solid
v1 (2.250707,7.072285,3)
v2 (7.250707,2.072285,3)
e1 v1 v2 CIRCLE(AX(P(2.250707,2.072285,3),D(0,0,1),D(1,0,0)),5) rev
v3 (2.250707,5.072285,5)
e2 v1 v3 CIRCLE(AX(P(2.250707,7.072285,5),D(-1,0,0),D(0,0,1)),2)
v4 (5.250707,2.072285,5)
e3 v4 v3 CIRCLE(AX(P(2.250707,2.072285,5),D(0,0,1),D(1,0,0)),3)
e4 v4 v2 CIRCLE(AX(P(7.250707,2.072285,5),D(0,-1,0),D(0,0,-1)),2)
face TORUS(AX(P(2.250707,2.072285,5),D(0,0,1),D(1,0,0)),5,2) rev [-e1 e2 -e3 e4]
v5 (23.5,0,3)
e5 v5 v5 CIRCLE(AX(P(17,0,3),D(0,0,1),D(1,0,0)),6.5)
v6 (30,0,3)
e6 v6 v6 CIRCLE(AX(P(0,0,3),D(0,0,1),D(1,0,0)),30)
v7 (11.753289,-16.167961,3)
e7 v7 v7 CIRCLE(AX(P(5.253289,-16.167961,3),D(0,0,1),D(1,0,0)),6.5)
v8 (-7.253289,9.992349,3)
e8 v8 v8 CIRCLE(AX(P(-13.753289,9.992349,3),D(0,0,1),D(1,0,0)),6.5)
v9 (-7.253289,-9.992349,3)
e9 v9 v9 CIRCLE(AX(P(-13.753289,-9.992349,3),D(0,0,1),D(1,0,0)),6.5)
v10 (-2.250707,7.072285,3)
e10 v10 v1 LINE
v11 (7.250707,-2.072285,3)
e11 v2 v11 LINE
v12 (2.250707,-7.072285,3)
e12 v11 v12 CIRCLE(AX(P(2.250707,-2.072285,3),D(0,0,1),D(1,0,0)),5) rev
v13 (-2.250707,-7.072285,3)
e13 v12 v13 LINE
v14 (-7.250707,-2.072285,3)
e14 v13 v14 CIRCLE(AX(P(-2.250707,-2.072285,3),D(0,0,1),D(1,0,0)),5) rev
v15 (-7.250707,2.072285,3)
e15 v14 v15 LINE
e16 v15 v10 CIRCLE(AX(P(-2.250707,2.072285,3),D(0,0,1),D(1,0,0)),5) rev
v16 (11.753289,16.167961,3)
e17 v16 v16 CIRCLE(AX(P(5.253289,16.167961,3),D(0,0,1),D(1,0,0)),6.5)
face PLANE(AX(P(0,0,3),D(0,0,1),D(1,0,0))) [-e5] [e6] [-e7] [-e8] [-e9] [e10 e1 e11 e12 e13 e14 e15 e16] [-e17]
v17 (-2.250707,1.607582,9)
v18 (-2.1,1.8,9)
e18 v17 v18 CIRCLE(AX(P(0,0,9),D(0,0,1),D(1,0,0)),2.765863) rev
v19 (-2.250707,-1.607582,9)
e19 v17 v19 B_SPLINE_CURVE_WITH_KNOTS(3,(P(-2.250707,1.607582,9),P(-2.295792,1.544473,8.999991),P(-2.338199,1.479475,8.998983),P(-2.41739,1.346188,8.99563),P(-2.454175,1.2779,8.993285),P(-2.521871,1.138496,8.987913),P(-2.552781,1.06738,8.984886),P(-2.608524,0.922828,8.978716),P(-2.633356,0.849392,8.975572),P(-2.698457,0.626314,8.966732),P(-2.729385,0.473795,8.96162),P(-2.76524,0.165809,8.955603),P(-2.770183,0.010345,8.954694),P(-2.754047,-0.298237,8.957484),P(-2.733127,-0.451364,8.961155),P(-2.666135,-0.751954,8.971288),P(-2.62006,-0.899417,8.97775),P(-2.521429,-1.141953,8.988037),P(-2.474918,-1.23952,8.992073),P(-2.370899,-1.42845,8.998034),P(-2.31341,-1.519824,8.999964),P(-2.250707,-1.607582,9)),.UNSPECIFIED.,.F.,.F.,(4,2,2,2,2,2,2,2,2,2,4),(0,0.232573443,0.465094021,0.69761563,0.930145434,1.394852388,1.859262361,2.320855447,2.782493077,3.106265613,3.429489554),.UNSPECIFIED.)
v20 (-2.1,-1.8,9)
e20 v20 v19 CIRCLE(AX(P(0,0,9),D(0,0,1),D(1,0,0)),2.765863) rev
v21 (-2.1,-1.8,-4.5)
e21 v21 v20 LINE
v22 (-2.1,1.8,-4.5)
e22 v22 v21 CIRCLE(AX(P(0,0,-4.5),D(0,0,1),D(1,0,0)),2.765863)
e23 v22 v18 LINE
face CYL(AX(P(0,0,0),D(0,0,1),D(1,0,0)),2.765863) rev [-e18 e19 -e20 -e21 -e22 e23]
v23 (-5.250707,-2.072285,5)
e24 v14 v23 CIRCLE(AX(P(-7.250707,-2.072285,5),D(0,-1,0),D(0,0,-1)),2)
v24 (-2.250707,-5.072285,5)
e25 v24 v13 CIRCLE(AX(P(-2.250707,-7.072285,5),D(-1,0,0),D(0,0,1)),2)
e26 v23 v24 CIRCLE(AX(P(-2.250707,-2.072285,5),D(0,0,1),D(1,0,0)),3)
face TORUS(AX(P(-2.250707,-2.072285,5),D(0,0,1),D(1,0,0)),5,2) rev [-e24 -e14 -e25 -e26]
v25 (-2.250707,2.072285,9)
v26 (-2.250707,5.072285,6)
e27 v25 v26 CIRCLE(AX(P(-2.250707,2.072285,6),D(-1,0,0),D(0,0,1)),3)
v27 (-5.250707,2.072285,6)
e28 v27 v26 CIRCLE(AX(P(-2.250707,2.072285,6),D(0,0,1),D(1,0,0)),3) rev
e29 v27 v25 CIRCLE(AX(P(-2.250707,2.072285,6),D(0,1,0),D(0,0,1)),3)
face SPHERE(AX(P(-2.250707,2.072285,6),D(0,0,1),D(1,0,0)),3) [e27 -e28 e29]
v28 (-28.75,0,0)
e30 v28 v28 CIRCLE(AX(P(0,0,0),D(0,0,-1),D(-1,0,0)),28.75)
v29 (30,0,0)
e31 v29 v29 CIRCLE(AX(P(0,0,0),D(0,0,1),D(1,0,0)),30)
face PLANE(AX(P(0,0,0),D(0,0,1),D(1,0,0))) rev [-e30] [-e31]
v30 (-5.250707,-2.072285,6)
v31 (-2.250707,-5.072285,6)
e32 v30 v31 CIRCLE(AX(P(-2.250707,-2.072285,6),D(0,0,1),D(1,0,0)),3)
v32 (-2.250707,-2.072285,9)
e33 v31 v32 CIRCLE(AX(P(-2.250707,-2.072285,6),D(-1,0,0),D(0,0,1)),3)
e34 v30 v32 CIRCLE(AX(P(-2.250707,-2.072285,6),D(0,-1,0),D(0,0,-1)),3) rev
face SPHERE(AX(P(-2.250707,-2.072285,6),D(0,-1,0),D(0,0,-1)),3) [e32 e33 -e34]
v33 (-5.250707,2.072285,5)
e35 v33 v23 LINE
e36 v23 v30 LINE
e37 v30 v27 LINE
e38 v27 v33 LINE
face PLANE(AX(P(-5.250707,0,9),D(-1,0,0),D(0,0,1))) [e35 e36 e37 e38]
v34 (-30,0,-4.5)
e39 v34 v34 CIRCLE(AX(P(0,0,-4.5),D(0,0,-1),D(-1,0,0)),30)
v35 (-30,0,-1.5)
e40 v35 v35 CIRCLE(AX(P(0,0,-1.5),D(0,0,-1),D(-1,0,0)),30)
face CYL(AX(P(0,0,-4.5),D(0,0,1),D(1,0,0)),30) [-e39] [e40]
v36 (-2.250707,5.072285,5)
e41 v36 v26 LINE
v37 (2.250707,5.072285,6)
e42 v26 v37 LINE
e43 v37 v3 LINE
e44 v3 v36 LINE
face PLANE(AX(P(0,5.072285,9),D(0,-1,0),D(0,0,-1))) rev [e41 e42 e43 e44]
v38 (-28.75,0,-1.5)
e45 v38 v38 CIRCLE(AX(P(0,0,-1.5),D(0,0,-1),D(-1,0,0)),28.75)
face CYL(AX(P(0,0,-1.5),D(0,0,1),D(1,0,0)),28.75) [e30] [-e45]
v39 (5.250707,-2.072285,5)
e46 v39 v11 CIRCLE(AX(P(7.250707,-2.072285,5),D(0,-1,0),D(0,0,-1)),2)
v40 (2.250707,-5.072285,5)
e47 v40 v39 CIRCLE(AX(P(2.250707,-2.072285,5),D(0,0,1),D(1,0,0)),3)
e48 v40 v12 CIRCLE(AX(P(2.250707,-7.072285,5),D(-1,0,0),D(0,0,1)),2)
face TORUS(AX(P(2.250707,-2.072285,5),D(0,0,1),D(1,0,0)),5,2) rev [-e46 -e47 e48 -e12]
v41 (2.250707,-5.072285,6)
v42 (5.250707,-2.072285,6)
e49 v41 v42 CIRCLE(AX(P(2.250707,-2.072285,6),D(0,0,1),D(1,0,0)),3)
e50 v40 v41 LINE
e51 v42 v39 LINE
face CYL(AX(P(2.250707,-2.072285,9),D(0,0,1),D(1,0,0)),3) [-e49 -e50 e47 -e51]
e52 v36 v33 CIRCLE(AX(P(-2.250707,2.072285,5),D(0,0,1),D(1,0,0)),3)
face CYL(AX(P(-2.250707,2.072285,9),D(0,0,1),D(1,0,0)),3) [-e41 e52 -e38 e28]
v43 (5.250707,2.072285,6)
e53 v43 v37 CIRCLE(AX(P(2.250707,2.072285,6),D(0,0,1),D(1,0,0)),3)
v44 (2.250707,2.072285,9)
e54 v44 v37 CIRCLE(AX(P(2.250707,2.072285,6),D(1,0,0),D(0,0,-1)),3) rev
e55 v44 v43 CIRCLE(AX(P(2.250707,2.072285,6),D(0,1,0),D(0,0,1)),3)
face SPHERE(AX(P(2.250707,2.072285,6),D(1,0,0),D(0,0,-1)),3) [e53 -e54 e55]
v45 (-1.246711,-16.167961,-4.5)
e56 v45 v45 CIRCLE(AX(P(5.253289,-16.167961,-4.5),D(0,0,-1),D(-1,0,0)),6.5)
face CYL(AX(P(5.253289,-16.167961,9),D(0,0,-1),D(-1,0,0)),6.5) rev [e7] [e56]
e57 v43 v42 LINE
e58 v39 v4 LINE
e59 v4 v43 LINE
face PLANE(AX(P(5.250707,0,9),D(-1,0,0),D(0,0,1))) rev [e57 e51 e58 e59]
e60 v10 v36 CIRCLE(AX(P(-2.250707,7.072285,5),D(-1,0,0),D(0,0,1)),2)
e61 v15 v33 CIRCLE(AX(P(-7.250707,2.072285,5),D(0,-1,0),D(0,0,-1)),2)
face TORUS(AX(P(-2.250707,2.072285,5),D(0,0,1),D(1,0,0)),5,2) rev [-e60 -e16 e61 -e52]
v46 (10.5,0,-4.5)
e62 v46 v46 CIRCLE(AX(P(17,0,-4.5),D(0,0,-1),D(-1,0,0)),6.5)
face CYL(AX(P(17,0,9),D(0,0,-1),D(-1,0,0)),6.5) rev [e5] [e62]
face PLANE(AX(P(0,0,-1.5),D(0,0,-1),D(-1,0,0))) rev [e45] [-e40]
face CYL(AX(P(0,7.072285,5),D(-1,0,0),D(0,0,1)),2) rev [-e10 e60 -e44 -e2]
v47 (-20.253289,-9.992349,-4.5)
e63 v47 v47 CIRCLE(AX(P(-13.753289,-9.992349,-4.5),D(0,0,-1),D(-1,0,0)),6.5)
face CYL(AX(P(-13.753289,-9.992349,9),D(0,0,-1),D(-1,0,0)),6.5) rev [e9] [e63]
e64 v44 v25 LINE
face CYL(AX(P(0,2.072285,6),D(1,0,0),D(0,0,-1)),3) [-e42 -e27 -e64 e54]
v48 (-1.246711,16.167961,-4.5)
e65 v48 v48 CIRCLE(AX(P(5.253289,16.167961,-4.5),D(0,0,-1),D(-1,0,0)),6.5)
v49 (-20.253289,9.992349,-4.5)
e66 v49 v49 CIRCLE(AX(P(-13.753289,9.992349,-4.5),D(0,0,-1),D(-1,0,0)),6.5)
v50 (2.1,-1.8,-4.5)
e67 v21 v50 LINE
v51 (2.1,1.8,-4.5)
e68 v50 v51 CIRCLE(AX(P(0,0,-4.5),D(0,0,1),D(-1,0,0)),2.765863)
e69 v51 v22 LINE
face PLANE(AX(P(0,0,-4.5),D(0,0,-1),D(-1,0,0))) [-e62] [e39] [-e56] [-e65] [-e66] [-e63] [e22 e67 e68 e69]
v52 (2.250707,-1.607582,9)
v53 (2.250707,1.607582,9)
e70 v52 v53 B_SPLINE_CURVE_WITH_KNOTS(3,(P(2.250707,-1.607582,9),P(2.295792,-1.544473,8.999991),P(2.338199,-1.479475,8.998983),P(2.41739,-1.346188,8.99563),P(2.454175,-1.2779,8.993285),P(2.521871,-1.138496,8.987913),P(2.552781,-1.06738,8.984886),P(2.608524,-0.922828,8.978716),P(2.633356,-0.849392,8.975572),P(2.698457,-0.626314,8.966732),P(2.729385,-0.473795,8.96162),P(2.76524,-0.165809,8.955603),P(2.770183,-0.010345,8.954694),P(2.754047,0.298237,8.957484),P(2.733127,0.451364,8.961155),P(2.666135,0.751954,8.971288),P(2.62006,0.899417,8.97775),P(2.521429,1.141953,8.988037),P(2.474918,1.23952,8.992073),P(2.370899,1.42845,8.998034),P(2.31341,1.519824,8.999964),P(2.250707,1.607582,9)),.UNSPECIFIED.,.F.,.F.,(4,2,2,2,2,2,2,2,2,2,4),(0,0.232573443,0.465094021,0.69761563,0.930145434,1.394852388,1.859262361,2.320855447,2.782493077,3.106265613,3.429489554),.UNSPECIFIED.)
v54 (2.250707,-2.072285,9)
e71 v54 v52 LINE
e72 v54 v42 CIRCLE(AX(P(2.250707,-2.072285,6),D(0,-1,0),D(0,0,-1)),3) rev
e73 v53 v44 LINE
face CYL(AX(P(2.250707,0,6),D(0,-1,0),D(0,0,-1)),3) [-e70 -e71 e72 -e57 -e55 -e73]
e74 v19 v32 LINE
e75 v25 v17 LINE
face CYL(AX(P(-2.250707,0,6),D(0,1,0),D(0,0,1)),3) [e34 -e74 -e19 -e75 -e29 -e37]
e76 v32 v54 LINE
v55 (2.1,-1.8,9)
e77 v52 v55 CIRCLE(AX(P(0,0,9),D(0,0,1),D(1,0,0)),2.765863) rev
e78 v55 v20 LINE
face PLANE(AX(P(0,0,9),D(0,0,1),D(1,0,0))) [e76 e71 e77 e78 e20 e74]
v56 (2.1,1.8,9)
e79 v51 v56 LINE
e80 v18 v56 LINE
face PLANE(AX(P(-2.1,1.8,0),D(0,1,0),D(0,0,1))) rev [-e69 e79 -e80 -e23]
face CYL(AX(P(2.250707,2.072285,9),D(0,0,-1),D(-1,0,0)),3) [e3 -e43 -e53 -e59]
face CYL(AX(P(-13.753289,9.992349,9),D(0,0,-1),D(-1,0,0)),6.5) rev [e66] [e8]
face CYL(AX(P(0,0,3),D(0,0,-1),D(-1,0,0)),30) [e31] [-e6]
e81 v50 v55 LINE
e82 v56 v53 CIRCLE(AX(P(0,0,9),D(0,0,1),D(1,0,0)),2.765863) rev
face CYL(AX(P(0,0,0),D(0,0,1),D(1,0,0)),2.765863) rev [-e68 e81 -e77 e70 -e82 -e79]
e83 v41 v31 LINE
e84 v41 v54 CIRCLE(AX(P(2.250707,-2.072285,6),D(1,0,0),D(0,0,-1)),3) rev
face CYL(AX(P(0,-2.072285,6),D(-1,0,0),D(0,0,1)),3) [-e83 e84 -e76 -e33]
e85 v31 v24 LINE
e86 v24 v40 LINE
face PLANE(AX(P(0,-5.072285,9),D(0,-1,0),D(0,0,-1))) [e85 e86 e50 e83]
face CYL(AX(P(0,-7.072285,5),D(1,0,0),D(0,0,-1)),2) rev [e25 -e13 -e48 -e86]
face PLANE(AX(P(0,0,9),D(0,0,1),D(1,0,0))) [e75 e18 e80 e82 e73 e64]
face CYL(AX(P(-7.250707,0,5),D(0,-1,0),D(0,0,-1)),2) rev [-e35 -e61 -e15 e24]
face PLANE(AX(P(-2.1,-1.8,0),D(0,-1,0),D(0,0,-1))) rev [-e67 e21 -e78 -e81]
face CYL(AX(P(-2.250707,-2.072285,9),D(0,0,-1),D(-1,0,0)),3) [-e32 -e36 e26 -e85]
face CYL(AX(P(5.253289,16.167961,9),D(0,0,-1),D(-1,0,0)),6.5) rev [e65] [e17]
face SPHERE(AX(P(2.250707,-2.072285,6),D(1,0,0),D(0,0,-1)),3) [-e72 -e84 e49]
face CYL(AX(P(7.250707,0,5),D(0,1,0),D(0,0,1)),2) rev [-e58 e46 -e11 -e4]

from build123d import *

# Parameters (mm, degrees)
ESQUISSE2_R             = 30
BOSS_EXTRU_1_DEPTH      = 3
ENL_V_MAT_EXTRU_1_DEPTH = 43.532340636
BOSS_EXTRU_3_START      = 6
ESQUISSE5_W             = 10.501413836
ESQUISSE5_H             = 10.144569676
BOSS_EXTRU_3_DEPTH      = 6
ESQUISSE8_R             = 28.75
BOSS_EXTRU_4_DEPTH      = 1.5
BOSS_EXTRU_5_START      = 3
ESQUISSE9_R             = 30
BOSS_EXTRU_5_DEPTH      = 3
ENL_V_MAT_EXTRU_4_DEPTH = 44.370496884
CONG_1_R                = 3
CONG_2_R                = 2
ESQUISSE11_R            = 6.5
AJOURAGE_DEPTH          = 45.522466269


with BuildPart() as part:
    # Esquisse2 → Boss.-Extru.1 (new body)
    with BuildSketch(Plane.XY):
        Circle(ESQUISSE2_R)
    extrude(amount=BOSS_EXTRU_1_DEPTH)

    # Esquisse4 → Enlèv. mat.-Extru.1 (cut, through all)
    with BuildSketch(Plane.XY.offset(3)):
        with BuildLine():
            Line((-2.1, -1.8), (2.1, -1.8))
            ThreePointArc((2.1, -1.8), (2.765863337, 0), (2.1, 1.8))
            Line((2.1, 1.8), (-2.1, 1.8))
            ThreePointArc((-2.1, 1.8), (-2.765863337, 0), (-2.1, -1.8))
        make_face()
    extrude(amount=-ENL_V_MAT_EXTRU_1_DEPTH, mode=Mode.SUBTRACT)

    # Esquisse5 → Boss.-Extru.3 (add)
    with BuildSketch(Plane.XY.offset(3).offset(BOSS_EXTRU_3_START)):
        Rectangle(ESQUISSE5_W, ESQUISSE5_H)
        with BuildLine():
            Line((-2.1, 1.8), (2.1, 1.8))
            ThreePointArc((2.1, 1.8), (2.765863337, 0), (2.1, -1.8))
            Line((2.1, -1.8), (-2.1, -1.8))
            ThreePointArc((-2.1, -1.8), (-2.765863337, 0), (-2.1, 1.8))
        make_face(mode=Mode.SUBTRACT)
    extrude(amount=-BOSS_EXTRU_3_DEPTH)

    # Esquisse8 → Boss.-Extru.4 (add)
    with BuildSketch(Plane(origin=(0, 0, 0), x_dir=(-1, 0, 0), z_dir=(0, 0, -1))):
        Circle(ESQUISSE8_R)
    extrude(amount=BOSS_EXTRU_4_DEPTH)

    # Esquisse9 → Boss.-Extru.5 (add)
    with BuildSketch(Plane(origin=(0, 0, -1.5), x_dir=(-1, 0, 0), z_dir=(0, 0, -1)).offset(BOSS_EXTRU_5_START)):
        with Locations(Location((0, 0, 0), (0, 0, 180))):
            Circle(ESQUISSE9_R)
    extrude(amount=-BOSS_EXTRU_5_DEPTH)

    # Esquisse10 → Enlèv. mat.-Extru.4 (cut, through all)
    with BuildSketch(Plane.XY):
        with BuildLine():
            Line((-2.1, 1.8), (2.1, 1.8))
            ThreePointArc((2.1, 1.8), (2.765863337, 0), (2.1, -1.8))
            Line((2.1, -1.8), (-2.1, -1.8))
            ThreePointArc((-2.1, -1.8), (-2.765863337, 0), (-2.1, 1.8))
        make_face()
    extrude(amount=-ENL_V_MAT_EXTRU_4_DEPTH, mode=Mode.SUBTRACT)

    # Congé1
    # the kernel refuses this fillet: 3 mm, written as the material it takes off along each edge
    with BuildSketch(Plane(origin=(-2.250706918, -2.072284838, 6), x_dir=(-1, 0, 0), z_dir=(0, -1, 0))) as cong_1_piece_1_section:
        Polygon((0, 0), (CONG_1_R, 0), (CONG_1_R, -CONG_1_R), (0, -CONG_1_R), align=None)
    cong_1_piece_1 = extrude(amount=CONG_1_R, mode=Mode.PRIVATE)
    cong_1_piece_1 = cong_1_piece_1 - Plane(origin=(-2.250706918, -2.072284838, 6), x_dir=(0.7071067811865475, 0, -0.7071067811865475), z_dir=(0, -1, 0)) * Sphere(CONG_1_R, mode=Mode.PRIVATE)
    add(cong_1_piece_1, mode=Mode.SUBTRACT)
    with BuildSketch(Plane(origin=(-2.250706918, 2.072284838, 6), x_dir=(-1, 0, 0), z_dir=(0, 1, 0))) as cong_1_piece_2_section:
        Polygon((0, 0), (CONG_1_R, 0), (CONG_1_R, CONG_1_R), (0, CONG_1_R), align=None)
    cong_1_piece_2 = extrude(amount=CONG_1_R, mode=Mode.PRIVATE)
    cong_1_piece_2 = cong_1_piece_2 - Plane(origin=(-2.250706918, 2.072284838, 6), x_dir=(0.7071067811865475, 0, -0.7071067811865475), z_dir=(0, 1, 0)) * Sphere(CONG_1_R, mode=Mode.PRIVATE)
    add(cong_1_piece_2, mode=Mode.SUBTRACT)
    with BuildSketch(Plane(origin=(2.250706918, -2.072284838, 6), x_dir=(0, -1, 0), z_dir=(1, 0, 0))) as cong_1_piece_3_section:
        Polygon((0, 0), (CONG_1_R, 0), (CONG_1_R, -CONG_1_R), (0, -CONG_1_R), align=None)
    cong_1_piece_3 = extrude(amount=CONG_1_R, mode=Mode.PRIVATE)
    cong_1_piece_3 = cong_1_piece_3 - Plane(origin=(2.250706918, -2.072284838, 6), x_dir=(0, 0.7071067811865475, -0.7071067811865475), z_dir=(1, 0, 0)) * Sphere(CONG_1_R, mode=Mode.PRIVATE)
    add(cong_1_piece_3, mode=Mode.SUBTRACT)
    with BuildSketch(Plane(origin=(2.250706918, 2.072284838, 6), x_dir=(1, 0, 0), z_dir=(0, 1, 0))) as cong_1_piece_4_section:
        Polygon((0, 0), (CONG_1_R, 0), (CONG_1_R, -CONG_1_R), (0, -CONG_1_R), align=None)
    cong_1_piece_4 = extrude(amount=CONG_1_R, mode=Mode.PRIVATE)
    cong_1_piece_4 = cong_1_piece_4 - Plane(origin=(2.250706918, 2.072284838, 6), x_dir=(-0.7071067811865475, 0, -0.7071067811865475), z_dir=(0, 1, 0)) * Sphere(CONG_1_R, mode=Mode.PRIVATE)
    add(cong_1_piece_4, mode=Mode.SUBTRACT)
    with BuildSketch(Plane(origin=(-5.250706918, -2.072284838, 9), x_dir=(0, 0, -1), z_dir=(0, 1, 0))) as cong_1_piece_5:
        with BuildLine():
            CenterArc((CONG_1_R, -CONG_1_R), CONG_1_R, 90, 90)
            Line((0, -CONG_1_R), (0, 0))
            Line((0, 0), (CONG_1_R, 0))
        make_face()
    extrude(amount=4.144569676, mode=Mode.SUBTRACT)
    with BuildSketch(Plane(origin=(-5.250706918, 5.072284838, 6), x_dir=(0, -1, 0), z_dir=(0, 0, -1)), Plane(origin=(5.250706918, -5.072284838, 6), x_dir=(0, 1, 0), z_dir=(0, 0, -1)), Plane(origin=(5.250706918, 5.072284838, 6), x_dir=(-1, 0, 0), z_dir=(0, 0, -1))) as cong_1_piece_6:
        with BuildLine():
            CenterArc((CONG_1_R, -CONG_1_R), CONG_1_R, 90, 90)
            Line((0, -CONG_1_R), (0, 0))
            Line((0, 0), (CONG_1_R, 0))
        make_face()
    extrude(amount=3, mode=Mode.SUBTRACT)
    with BuildSketch(Plane(origin=(2.250706918, -5.072284838, 9), x_dir=(0, 1, 0), z_dir=(-1, 0, 0)), Plane(origin=(-2.250706918, 5.072284838, 9), x_dir=(0, -1, 0), z_dir=(1, 0, 0))) as cong_1_piece_7:
        with BuildLine():
            CenterArc((CONG_1_R, CONG_1_R), CONG_1_R, 180, 90)
            Line((0, CONG_1_R), (0, 0))
            Line((0, 0), (CONG_1_R, 0))
        make_face()
    extrude(amount=4.501413836, mode=Mode.SUBTRACT)
    with BuildSketch(Plane(origin=(-5.250706918, -5.072284838, 6), x_dir=(0, 1, 0), z_dir=(0, 0, -1))) as cong_1_piece_8:
        with BuildLine():
            CenterArc((CONG_1_R, CONG_1_R), CONG_1_R, 180, 90)
            Line((0, CONG_1_R), (0, 0))
            Line((0, 0), (CONG_1_R, 0))
        make_face()
    extrude(amount=3, mode=Mode.SUBTRACT)
    with BuildSketch(Plane(origin=(5.250706918, 2.072284838, 9), x_dir=(-1, 0, 0), z_dir=(0, -1, 0))) as cong_1_piece_9:
        with BuildLine():
            CenterArc((CONG_1_R, CONG_1_R), CONG_1_R, 180, 90)
            Line((0, CONG_1_R), (0, 0))
            Line((0, 0), (CONG_1_R, 0))
        make_face()
    extrude(amount=4.144569676, mode=Mode.SUBTRACT)

    # Congé2
    cong_2_edges = [part.edges().sort_by_distance(p)[0] for p in [
        (-5.250706918, 0, 3),
        (0, 5.072284838, 3),
        (0, -5.072284838, 3),
        (5.250706918, 0, 3),
        (-4.372027261, 4.193605182, 3),
        (-4.372027261, -4.193605182, 3),
        (4.372027261, -4.193605182, 3),
        (4.372027261, 4.193605182, 3),
    ]]
    fillet(cong_2_edges, radius=CONG_2_R)

    # Esquisse11 → Ajourage (cut, through all)
    with BuildSketch(Plane(origin=(0, 0, -4.5), x_dir=(-1, 0, 0), z_dir=(0, 0, -1))):
        with Locations((-17, 0)):
            Circle(ESQUISSE11_R)
        with Locations((-5.253288904, 16.167960777)):
            Circle(ESQUISSE11_R)
        with Locations((13.753288904, 9.992349289)):
            Circle(ESQUISSE11_R)
        with Locations((13.753288904, -9.992349289)):
            Circle(ESQUISSE11_R)
        with Locations((-5.253288904, -16.167960777)):
            Circle(ESQUISSE11_R)
    extrude(amount=-AJOURAGE_DEPTH, mode=Mode.SUBTRACT)


solid = part.part
